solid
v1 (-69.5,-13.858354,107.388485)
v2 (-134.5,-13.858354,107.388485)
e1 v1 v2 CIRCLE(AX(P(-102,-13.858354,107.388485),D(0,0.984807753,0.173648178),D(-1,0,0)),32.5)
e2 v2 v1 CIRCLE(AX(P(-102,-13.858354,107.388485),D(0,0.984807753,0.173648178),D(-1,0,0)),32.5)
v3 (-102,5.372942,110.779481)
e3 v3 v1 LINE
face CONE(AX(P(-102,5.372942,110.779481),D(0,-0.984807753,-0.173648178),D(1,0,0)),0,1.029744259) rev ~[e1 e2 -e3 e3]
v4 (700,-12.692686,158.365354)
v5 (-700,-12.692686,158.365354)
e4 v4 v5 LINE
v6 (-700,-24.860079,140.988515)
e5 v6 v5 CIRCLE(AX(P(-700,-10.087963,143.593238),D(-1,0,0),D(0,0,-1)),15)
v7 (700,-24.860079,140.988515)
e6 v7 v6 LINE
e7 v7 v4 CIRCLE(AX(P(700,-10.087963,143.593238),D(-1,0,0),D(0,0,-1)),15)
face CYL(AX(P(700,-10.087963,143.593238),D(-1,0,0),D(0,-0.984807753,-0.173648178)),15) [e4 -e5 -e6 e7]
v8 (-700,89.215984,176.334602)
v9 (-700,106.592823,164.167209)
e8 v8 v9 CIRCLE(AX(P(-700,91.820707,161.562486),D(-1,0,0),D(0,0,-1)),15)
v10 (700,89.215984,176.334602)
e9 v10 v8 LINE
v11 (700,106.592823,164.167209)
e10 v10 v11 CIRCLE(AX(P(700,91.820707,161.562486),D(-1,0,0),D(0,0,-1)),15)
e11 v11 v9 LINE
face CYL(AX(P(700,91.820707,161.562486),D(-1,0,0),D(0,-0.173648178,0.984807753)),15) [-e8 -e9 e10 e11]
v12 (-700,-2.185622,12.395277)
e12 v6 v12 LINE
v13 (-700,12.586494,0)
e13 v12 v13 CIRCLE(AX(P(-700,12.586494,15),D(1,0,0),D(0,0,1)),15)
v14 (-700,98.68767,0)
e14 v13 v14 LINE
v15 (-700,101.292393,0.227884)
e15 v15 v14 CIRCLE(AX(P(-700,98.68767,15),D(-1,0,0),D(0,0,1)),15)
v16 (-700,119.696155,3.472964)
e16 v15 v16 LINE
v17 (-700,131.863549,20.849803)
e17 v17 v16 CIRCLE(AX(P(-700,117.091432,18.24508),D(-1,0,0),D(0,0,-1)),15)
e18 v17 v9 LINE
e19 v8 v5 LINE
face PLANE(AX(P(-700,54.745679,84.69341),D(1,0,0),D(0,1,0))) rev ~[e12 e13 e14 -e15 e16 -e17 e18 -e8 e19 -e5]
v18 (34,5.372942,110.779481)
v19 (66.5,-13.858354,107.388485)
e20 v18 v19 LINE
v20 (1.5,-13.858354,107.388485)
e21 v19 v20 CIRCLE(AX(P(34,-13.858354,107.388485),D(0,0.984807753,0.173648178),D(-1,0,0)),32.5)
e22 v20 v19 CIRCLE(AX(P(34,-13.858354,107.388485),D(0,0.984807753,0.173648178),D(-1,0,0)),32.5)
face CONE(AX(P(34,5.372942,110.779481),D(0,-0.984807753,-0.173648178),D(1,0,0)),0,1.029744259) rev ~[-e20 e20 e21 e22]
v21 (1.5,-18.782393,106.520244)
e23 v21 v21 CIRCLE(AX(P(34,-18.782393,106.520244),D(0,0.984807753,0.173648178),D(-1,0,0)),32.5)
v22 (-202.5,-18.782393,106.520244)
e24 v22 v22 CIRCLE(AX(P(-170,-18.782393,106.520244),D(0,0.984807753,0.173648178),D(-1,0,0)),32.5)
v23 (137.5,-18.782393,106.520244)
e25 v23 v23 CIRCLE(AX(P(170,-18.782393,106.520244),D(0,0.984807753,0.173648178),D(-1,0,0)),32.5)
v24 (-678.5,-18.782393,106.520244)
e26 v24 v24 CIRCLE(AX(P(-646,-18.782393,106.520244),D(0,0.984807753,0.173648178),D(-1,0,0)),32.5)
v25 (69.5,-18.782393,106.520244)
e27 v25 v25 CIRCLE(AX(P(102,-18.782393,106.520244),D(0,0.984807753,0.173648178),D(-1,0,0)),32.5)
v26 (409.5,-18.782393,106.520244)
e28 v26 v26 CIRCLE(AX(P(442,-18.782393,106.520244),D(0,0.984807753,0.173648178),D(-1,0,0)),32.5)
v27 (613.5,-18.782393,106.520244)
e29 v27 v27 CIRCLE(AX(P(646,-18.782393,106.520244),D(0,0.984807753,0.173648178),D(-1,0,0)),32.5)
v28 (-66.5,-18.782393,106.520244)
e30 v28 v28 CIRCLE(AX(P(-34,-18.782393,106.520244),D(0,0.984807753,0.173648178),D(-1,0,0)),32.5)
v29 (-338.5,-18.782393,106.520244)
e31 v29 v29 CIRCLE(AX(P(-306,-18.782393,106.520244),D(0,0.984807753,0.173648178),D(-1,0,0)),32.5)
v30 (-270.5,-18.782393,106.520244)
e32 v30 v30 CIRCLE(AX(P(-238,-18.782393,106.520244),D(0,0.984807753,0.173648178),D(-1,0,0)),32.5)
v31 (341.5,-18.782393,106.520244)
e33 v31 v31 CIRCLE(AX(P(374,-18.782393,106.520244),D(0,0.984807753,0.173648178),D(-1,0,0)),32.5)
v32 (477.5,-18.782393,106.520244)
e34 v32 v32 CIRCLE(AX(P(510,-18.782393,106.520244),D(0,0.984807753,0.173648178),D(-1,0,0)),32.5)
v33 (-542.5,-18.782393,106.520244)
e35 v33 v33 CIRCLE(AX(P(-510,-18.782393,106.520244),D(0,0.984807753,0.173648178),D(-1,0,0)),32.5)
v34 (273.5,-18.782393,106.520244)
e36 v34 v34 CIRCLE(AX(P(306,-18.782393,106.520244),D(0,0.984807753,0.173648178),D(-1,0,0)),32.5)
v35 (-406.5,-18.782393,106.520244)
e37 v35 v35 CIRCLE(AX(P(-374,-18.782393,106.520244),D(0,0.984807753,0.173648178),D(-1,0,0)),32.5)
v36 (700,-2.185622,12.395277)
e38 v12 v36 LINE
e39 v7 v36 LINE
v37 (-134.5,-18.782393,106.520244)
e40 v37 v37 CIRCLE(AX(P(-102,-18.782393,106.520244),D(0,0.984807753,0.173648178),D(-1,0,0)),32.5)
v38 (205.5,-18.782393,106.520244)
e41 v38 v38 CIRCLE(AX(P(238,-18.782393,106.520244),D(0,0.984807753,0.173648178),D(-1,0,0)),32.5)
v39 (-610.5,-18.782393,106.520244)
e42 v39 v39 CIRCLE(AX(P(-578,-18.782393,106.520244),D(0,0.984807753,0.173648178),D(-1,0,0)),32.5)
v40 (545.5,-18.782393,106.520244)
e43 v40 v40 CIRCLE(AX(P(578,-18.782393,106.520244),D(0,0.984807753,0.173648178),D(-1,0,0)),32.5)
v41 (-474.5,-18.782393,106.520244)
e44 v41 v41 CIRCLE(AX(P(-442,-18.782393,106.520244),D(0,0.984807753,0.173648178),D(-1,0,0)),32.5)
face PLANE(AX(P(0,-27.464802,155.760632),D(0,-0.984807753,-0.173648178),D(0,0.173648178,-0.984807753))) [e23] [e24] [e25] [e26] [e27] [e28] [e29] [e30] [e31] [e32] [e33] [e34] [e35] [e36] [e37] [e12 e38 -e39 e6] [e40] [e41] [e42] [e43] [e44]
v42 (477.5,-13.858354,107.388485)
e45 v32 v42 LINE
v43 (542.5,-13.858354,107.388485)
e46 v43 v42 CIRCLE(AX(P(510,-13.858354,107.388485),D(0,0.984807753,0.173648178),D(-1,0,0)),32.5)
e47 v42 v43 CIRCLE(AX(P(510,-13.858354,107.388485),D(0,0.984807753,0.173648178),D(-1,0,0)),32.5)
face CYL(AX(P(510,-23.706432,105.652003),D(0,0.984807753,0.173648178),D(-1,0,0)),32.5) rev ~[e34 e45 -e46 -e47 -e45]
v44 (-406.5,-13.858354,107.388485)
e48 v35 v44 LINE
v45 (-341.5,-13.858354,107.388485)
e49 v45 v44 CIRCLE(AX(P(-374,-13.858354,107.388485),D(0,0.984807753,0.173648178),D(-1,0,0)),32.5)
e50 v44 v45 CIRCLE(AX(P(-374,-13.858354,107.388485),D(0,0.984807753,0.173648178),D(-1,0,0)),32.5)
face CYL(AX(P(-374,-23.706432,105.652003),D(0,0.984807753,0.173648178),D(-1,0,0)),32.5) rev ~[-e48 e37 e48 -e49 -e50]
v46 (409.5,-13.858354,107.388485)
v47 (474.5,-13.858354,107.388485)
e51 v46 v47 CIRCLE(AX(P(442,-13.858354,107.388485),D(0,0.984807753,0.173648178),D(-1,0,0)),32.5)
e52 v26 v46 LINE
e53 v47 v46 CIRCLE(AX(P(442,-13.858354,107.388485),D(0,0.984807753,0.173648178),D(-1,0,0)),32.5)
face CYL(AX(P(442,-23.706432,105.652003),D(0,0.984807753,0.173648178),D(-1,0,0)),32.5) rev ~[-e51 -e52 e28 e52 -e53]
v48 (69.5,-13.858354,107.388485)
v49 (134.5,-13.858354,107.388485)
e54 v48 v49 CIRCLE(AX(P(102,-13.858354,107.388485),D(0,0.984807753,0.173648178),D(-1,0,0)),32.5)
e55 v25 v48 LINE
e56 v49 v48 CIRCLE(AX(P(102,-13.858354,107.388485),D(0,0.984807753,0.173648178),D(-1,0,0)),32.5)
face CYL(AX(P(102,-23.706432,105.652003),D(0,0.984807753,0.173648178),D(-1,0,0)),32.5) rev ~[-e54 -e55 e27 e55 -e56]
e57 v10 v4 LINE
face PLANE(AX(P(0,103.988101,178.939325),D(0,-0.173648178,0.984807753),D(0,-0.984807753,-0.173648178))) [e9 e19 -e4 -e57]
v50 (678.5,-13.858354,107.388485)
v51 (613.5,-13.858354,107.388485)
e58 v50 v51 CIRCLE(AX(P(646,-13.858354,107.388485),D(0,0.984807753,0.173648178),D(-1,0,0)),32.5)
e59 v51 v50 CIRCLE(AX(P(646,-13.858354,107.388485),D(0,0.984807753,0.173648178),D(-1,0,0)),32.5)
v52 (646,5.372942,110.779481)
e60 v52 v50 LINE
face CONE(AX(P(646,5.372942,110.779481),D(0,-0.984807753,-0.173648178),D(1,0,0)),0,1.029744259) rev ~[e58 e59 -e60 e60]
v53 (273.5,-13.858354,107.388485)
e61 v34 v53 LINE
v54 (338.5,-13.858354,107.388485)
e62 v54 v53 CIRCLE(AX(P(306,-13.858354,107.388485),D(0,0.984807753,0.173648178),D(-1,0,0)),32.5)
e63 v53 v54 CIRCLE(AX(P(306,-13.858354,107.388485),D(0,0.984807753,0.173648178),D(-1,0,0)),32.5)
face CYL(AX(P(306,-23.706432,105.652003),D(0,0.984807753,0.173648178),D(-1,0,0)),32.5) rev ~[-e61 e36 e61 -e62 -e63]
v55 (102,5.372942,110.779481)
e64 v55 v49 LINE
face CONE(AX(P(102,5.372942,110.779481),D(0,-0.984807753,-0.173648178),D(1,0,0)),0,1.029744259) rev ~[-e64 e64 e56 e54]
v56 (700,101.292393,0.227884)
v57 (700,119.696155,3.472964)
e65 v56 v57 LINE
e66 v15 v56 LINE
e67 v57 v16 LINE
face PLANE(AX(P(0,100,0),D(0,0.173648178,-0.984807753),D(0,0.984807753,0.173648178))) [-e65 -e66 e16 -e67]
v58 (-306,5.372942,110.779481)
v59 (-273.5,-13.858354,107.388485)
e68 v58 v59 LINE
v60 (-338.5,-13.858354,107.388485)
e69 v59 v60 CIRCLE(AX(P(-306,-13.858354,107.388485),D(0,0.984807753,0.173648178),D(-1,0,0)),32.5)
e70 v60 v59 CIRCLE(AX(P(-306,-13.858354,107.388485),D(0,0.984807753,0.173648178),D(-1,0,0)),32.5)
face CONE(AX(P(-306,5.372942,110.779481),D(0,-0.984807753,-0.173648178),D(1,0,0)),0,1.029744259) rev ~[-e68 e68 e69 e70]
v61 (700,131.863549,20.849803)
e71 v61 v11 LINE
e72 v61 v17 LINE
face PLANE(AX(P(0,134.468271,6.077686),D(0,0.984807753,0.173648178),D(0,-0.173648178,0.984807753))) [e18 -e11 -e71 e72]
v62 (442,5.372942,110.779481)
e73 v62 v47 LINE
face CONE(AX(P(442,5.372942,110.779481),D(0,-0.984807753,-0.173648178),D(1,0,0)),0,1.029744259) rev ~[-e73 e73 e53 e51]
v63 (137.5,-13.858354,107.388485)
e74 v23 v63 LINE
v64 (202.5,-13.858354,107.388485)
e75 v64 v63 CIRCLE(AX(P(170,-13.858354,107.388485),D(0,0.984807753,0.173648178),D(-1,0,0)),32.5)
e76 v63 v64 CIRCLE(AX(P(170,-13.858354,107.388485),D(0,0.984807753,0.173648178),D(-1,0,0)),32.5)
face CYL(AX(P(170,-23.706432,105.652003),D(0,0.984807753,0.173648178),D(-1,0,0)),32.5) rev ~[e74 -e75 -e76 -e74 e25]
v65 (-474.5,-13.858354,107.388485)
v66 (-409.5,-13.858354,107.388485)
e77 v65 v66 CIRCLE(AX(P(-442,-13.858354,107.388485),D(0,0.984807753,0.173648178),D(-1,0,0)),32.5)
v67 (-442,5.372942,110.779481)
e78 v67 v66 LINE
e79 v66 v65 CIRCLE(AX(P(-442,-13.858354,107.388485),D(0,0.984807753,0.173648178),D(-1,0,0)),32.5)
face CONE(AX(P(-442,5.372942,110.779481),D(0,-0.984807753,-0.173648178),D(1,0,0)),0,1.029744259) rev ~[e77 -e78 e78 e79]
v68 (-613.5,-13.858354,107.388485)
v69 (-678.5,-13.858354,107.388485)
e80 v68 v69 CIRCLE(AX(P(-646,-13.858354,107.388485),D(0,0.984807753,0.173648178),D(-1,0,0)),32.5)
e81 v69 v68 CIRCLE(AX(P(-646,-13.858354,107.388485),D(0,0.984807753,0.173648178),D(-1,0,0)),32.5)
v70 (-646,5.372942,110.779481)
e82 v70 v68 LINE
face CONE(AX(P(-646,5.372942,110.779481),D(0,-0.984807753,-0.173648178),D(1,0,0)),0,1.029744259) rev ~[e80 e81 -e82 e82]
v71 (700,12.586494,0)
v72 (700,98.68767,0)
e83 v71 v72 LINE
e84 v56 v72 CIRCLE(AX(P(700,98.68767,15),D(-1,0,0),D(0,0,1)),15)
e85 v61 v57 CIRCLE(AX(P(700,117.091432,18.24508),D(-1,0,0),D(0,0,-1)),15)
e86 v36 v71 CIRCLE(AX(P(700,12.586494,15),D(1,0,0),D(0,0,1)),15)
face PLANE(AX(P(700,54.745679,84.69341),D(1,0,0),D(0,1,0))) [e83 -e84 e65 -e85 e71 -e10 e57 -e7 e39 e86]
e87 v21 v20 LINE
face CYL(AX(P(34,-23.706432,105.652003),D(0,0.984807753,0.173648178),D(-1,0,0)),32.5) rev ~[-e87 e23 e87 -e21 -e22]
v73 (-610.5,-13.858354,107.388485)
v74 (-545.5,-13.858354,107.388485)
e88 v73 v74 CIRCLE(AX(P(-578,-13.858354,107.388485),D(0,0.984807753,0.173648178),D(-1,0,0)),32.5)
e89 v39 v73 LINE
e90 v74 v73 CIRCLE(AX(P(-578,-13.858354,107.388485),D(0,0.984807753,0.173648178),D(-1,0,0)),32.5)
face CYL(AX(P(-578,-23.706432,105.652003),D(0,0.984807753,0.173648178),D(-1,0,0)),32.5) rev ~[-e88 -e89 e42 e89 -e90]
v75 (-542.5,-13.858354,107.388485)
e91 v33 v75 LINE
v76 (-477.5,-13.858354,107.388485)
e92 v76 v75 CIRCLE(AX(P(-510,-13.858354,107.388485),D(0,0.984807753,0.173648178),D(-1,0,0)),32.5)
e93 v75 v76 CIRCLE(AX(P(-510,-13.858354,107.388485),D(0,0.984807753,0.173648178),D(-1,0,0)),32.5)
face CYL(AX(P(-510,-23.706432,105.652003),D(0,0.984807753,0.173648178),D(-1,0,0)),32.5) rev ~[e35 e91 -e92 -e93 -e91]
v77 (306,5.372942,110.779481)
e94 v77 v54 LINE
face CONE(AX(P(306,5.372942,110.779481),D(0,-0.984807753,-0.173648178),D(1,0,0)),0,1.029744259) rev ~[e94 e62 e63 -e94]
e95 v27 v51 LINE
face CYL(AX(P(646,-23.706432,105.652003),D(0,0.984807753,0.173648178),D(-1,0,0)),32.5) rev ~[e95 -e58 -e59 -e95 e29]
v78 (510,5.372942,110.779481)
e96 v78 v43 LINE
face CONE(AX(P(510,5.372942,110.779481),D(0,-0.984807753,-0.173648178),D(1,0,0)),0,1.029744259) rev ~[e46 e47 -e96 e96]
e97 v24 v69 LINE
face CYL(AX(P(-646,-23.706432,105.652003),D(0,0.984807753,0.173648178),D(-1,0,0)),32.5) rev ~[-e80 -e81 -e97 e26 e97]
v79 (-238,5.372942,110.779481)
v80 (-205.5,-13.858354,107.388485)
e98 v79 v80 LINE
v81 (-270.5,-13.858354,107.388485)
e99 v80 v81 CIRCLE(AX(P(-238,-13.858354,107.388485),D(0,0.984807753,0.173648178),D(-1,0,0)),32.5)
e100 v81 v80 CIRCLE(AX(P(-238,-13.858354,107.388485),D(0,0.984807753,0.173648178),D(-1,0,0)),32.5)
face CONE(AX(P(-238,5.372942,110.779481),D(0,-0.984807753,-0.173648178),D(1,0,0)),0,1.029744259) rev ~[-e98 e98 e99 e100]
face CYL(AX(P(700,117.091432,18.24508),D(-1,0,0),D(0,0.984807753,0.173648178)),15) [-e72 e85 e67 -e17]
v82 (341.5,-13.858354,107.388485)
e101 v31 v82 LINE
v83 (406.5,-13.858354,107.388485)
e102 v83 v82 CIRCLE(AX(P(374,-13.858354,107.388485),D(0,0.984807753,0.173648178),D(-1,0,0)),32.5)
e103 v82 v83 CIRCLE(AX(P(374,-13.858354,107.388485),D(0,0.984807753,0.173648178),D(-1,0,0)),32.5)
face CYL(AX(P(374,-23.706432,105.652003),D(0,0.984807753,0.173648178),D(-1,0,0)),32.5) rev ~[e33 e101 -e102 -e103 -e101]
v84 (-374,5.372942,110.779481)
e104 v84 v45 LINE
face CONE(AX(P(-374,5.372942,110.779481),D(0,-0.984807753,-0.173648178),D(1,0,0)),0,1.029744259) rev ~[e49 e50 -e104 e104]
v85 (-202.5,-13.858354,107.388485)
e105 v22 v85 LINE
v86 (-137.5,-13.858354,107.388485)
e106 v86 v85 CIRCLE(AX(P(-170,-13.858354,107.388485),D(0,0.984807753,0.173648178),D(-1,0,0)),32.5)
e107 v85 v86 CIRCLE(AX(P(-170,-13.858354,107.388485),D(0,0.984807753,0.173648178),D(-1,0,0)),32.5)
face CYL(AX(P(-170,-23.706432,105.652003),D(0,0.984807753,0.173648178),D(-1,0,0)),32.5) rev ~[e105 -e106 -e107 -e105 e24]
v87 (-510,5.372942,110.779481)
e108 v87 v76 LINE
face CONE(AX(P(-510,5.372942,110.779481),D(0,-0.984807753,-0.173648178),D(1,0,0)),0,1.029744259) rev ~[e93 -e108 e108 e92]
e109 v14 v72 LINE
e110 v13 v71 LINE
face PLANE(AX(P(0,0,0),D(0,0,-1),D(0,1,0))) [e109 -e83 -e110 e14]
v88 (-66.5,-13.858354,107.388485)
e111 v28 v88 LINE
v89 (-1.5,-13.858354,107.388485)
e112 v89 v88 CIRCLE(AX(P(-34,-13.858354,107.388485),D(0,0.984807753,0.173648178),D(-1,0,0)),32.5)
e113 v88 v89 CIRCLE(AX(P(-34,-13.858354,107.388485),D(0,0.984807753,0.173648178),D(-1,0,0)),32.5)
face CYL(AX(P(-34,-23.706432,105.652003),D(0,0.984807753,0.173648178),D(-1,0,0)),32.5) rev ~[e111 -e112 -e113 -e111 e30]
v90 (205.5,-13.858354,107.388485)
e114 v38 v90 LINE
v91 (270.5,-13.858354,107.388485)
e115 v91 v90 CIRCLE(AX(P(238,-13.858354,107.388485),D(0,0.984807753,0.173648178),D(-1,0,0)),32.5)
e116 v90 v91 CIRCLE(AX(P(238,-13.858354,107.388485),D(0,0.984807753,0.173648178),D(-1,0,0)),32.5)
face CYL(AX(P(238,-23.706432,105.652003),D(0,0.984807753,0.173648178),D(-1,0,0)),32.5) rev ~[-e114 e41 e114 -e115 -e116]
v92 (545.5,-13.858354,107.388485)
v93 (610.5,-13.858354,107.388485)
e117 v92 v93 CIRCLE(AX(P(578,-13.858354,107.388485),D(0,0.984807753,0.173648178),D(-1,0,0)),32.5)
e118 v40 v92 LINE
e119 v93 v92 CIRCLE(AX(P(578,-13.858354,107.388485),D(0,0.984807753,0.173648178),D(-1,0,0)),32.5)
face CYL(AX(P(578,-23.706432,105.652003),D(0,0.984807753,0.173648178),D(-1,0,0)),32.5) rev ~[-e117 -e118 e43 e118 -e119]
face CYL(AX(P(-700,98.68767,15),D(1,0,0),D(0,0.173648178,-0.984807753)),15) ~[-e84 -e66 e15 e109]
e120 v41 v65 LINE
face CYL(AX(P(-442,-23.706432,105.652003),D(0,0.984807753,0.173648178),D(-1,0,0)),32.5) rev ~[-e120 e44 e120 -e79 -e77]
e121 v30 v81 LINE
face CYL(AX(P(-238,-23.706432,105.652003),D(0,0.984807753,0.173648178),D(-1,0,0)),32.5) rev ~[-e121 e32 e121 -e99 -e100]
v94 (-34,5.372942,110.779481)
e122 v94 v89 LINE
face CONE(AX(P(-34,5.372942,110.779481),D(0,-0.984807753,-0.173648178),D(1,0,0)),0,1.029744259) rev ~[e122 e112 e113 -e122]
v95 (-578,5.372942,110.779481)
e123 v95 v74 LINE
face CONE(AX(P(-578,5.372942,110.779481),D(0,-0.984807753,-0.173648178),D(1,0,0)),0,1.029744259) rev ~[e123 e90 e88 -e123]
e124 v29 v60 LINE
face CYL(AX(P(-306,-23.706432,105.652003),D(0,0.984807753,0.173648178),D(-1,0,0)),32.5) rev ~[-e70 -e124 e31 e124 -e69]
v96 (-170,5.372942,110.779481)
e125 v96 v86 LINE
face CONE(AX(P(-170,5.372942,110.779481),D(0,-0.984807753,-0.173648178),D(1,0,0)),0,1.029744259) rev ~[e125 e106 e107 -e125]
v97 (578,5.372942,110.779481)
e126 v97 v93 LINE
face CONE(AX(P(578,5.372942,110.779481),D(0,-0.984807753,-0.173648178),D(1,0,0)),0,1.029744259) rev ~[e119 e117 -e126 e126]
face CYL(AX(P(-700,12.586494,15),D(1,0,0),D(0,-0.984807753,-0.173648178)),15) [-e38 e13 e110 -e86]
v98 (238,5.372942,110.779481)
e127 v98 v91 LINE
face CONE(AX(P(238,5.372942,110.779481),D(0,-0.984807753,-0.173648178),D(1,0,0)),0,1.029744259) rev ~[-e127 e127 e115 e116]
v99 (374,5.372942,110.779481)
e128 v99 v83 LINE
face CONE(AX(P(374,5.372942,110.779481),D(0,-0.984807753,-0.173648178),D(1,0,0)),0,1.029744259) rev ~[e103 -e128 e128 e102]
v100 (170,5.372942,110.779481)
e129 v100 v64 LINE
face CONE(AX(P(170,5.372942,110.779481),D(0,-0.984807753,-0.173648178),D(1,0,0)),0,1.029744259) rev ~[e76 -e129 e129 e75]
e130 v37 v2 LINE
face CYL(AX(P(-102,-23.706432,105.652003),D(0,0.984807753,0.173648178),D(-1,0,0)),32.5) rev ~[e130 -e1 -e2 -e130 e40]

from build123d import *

# Parameters (mm, degrees)
F1_DEPTH = 700
F2_R     = 15
F4_D     = 65
F4_DEPTH = 5
F4_TIP   = 19.5279701184


# Not quite as in the source:
# - a feature names something its author has since deleted; it is built from what else it names


with BuildPart() as f1:
    # F0 (on Right) → F1 (new body, symmetric)
    with BuildSketch(Plane.YZ):
        Polygon((-27.4648018735, 155.7606315443), (0, 0), (100, 0), (134.4682713554, 6.0776862183), (103.9881005213, 178.9393249289), align=None)
    extrude(amount=F1_DEPTH, both=True)

    # F2
    f2_edges = [f1.edges().sort_by_distance(p)[0] for p in [
        (0, 100, 0),
        (0, 134.468271, 6.077686),
        (0, 103.988101, 178.939325),
        (0, -27.464802, 155.760632),
        (0, 0, 0),
    ]]
    fillet(f2_edges, radius=F2_R)

    # F4
    with Locations(Plane(origin=(0, 0, 0), x_dir=(1, 0, 0), z_dir=(0, -0.984807753, -0.1736481777))):
        with Locations((-646, 108.1634903542), (-578, 108.1634903542), (-510, 108.1634903542), (-442, 108.1634903542), (-374, 108.1634903542), (-306, 108.1634903542), (-238, 108.1634903542), (-170, 108.1634903542), (-102, 108.1634903542), (-34, 108.1634903542), (34, 108.1634903542), (102, 108.1634903542), (170, 108.1634903542), (238, 108.1634903542), (306, 108.1634903542), (374, 108.1634903542), (442, 108.1634903542), (510, 108.1634903542), (578, 108.1634903542), (646, 108.1634903542)):
            Hole(F4_D / 2, depth=F4_DEPTH)
            with Locations((0, 0, -(F4_DEPTH + F4_TIP / 2))):  # 118° drill point
                Cone(0, F4_D / 2, F4_TIP, mode=Mode.SUBTRACT)


solid = f1.part
